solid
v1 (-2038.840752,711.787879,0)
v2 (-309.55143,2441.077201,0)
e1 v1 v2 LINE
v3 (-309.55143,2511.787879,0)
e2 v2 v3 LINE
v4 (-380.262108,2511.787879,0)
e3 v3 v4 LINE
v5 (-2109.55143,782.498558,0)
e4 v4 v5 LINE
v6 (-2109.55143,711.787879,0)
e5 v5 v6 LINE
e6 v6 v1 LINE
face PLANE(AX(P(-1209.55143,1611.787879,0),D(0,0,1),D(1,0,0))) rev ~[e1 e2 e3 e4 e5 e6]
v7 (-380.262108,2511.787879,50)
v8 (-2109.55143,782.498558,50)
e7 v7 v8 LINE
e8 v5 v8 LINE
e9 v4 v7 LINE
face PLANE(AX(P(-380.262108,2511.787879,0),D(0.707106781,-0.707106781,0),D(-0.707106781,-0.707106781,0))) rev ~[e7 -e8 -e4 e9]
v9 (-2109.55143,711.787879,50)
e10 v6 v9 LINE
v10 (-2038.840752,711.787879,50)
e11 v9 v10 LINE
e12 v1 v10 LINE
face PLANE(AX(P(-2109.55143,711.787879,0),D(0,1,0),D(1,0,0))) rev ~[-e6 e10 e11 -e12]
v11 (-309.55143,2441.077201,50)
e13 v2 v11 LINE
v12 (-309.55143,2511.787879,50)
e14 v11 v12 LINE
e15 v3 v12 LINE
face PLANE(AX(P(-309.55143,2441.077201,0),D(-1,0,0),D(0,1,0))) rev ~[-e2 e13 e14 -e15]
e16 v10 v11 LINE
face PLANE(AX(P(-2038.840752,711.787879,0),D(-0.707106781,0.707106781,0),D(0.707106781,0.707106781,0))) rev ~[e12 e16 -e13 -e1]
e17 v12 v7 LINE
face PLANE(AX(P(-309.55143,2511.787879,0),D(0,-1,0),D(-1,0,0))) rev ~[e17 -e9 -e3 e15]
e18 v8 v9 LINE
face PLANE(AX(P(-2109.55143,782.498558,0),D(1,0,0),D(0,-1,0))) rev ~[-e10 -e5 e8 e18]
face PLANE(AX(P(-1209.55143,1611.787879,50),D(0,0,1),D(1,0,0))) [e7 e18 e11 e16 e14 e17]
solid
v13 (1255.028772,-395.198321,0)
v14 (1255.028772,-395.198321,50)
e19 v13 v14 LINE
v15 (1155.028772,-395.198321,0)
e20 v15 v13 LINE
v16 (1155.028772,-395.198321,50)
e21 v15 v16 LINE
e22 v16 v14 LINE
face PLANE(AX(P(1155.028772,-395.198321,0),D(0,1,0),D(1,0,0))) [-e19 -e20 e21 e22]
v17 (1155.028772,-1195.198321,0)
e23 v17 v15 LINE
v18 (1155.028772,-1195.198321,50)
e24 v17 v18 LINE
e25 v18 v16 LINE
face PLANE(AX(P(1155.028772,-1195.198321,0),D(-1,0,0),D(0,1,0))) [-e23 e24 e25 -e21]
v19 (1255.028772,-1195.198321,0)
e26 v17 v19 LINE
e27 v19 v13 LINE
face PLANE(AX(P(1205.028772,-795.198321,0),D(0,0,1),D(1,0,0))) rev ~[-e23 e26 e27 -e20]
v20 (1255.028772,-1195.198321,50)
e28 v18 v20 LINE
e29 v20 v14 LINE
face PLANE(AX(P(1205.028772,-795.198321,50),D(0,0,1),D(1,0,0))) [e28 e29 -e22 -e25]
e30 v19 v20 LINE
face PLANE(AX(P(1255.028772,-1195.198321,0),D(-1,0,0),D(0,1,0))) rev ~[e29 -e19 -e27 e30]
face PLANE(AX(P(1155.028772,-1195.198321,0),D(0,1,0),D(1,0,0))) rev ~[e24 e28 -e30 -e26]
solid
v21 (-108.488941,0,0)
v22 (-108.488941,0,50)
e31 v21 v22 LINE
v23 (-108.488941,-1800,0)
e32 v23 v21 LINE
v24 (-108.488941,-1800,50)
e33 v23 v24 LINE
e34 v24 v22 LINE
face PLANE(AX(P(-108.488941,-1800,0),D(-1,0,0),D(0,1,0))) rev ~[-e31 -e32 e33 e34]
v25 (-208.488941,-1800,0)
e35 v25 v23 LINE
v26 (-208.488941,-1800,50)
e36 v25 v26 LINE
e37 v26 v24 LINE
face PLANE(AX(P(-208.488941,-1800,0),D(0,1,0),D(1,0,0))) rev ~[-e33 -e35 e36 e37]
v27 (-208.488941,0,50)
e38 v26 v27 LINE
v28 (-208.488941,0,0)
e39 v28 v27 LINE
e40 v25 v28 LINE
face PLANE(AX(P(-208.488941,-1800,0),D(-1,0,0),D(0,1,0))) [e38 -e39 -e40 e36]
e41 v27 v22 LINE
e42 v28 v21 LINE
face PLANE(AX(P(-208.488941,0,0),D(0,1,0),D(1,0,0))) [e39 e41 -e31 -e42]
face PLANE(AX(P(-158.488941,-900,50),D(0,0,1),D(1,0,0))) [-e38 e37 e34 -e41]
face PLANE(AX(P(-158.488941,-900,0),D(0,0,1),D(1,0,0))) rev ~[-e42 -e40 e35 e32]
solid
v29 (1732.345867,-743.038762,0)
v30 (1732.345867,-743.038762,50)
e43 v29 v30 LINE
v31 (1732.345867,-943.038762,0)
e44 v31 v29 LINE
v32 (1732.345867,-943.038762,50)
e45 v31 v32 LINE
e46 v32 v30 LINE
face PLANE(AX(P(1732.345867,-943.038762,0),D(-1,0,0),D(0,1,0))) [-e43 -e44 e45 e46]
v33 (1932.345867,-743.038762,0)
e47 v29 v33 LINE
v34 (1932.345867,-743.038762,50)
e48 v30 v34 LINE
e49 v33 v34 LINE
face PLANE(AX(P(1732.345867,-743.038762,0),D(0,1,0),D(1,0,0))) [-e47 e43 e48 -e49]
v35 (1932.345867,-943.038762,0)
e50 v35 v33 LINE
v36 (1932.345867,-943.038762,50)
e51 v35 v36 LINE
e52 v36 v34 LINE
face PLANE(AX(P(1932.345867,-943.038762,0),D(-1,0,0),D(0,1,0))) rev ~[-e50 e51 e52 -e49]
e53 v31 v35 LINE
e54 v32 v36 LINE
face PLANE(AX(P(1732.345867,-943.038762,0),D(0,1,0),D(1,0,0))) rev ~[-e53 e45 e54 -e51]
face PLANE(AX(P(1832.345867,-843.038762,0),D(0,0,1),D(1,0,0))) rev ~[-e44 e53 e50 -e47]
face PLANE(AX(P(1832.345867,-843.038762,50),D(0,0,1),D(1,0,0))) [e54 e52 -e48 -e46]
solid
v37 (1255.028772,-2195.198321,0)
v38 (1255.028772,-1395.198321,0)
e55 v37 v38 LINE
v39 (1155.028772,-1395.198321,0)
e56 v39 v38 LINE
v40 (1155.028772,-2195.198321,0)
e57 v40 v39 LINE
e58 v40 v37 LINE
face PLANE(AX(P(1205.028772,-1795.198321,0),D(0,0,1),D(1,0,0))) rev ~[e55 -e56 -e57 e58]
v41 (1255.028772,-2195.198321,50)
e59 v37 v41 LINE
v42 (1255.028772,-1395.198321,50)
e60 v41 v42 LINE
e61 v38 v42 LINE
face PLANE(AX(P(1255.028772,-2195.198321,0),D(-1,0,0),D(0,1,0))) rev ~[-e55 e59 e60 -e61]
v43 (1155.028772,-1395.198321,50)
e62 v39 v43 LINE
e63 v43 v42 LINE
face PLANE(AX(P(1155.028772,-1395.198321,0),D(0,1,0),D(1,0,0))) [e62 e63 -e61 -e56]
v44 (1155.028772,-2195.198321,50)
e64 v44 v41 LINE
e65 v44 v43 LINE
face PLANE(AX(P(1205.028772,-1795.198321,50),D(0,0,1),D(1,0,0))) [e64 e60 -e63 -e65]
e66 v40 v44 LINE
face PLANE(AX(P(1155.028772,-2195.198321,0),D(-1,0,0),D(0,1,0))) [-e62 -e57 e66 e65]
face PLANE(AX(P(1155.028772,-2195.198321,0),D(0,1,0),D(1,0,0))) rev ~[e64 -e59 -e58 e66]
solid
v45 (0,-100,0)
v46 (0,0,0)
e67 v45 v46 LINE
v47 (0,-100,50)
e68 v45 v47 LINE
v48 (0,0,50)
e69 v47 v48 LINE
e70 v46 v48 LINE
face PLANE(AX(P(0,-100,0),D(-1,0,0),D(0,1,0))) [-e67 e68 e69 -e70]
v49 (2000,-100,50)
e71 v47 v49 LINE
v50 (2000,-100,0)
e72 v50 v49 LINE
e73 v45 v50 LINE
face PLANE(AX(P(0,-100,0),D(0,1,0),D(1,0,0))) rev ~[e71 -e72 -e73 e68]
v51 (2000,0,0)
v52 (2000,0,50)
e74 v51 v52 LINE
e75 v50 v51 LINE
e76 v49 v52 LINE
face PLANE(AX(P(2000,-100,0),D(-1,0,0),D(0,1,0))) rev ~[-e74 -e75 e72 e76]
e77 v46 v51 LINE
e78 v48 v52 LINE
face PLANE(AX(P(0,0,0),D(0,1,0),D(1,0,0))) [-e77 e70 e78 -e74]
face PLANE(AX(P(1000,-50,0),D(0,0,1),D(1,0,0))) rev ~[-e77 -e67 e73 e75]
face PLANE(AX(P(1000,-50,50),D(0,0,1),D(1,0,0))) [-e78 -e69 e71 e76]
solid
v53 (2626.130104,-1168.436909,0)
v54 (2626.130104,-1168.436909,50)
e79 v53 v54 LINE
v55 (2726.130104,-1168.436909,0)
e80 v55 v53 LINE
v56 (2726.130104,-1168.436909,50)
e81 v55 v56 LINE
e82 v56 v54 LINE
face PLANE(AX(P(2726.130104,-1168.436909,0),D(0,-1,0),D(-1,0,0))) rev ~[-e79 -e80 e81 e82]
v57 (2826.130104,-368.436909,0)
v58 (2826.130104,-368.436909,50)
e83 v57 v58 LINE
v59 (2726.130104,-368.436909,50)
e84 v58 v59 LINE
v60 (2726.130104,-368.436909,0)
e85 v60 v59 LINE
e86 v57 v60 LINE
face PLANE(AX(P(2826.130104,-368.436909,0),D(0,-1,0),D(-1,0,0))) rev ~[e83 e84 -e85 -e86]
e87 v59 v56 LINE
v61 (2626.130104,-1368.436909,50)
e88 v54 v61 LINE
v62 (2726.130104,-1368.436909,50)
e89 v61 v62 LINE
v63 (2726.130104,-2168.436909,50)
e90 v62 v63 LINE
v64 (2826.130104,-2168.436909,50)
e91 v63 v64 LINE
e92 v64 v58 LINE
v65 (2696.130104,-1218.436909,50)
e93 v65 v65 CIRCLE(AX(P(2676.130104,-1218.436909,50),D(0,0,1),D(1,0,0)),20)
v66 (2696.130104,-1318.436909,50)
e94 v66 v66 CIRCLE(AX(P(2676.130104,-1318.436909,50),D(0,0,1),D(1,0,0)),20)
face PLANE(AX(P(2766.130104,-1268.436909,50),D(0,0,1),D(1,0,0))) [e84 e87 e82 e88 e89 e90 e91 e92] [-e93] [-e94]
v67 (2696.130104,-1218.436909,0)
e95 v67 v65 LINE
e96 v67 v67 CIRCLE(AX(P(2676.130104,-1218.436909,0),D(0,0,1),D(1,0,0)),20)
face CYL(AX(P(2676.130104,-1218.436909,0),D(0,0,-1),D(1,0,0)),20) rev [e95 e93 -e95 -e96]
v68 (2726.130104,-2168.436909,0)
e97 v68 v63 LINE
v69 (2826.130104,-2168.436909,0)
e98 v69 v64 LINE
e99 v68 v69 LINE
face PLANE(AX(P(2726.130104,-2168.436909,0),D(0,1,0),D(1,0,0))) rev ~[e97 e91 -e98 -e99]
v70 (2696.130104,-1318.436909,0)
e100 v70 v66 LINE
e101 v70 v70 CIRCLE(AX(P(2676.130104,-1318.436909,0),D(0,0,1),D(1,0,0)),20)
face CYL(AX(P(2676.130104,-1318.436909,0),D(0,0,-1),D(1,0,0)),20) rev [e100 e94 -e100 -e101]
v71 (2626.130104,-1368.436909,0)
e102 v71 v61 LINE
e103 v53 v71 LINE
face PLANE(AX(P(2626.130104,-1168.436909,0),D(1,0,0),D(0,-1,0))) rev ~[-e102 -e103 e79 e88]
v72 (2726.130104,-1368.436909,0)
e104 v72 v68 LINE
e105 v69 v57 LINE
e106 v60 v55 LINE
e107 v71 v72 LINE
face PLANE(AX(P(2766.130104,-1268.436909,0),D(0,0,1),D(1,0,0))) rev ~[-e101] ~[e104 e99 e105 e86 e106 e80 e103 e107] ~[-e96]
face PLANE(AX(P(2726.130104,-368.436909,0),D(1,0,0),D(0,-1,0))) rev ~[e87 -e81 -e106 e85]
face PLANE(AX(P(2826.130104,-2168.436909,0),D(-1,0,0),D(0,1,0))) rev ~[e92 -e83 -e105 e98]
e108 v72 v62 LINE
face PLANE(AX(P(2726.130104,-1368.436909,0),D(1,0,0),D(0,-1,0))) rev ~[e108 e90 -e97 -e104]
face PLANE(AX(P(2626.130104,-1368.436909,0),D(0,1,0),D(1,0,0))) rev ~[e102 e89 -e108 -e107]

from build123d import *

# Parameters (mm, degrees)
F0_W      = 2000
F0_H      = 100
F1_DEPTH  = 50
F2_W      = 100
F2_H      = 1800
F3_DEPTH  = 50
F4_W      = 100
F4_H      = 800
F5_DEPTH  = 50
F6_R      = 20
F7_DEPTH  = 50
F9_DEPTH  = 50
F10_W     = 200
F10_H     = 200
F11_DEPTH = 50


# Not quite as in the source:
# - a feature names something its author has since deleted; it is built from what else it names


with BuildPart() as f1:
    # F0 (on Top) → F1 (new body)
    with BuildSketch(Plane.XY):
        with Locations((1000, -50)):
            Rectangle(F0_W, F0_H)
    extrude(amount=F1_DEPTH)


with BuildPart() as f3:
    # F2 (on Top) → F3 (new body)
    with BuildSketch(Plane.XY):
        with Locations((-158.4889411926, -900)):
            Rectangle(F2_W, F2_H)
    extrude(amount=F3_DEPTH)


with BuildPart() as f5:
    # F4 (on Top) → F5 (new body)
    with BuildSketch(Plane.XY):
        with Locations((1205.0287723541, -795.1983213425)):
            Rectangle(F4_W, F4_H)
    extrude(amount=F5_DEPTH)


with BuildPart() as f5b:
    # F4 (on Top) → F5, piece 2 (new body)
    with BuildSketch(Plane.XY):
        with Locations((1205.0287723541, -1795.1983213425)):
            Rectangle(F4_W, F4_H)
    extrude(amount=F5_DEPTH)


with BuildPart() as f7:
    # F6 (on Top) → F7 (new body)
    with BuildSketch(Plane.XY):
        Polygon((2826.1301040649, -2168.4369087219), (2826.1301040649, -368.4369087219), (2726.1301040649, -368.4369087219), (2726.1301040649, -1168.4369087219), (2626.1301040649, -1168.4369087219), (2626.1301040649, -1368.4369087219), (2726.1301040649, -1368.4369087219), (2726.1301040649, -2168.4369087219), align=None)
        with Locations((2676.1301040649, -1318.4369087219)):
            Circle(F6_R, mode=Mode.SUBTRACT)
        with Locations((2676.1301040649, -1218.4369087219)):
            Circle(F6_R, mode=Mode.SUBTRACT)
    extrude(amount=F7_DEPTH)


with BuildPart() as f9:
    # F8 (on Top) → F9 (new body)
    with BuildSketch(Plane.XY):
        Polygon((-2038.8407516299, 711.787879467), (-309.5514297485, 2441.0772013484), (-309.5514297485, 2511.787879467), (-380.2621078672, 2511.787879467), (-2109.5514297485, 782.4985575857), (-2109.5514297485, 711.787879467), align=None)
    extrude(amount=F9_DEPTH)


with BuildPart() as f11:
    # F10 (on Top) → F11 (new body)
    with BuildSketch(Plane.XY):
        with Locations((1832.345867157, -843.0387616158)):
            Rectangle(F10_W, F10_H)
    extrude(amount=F11_DEPTH)


solid = Compound([f1.part, f3.part, f5.part, f5b.part, f7.part, f9.part, f11.part])
